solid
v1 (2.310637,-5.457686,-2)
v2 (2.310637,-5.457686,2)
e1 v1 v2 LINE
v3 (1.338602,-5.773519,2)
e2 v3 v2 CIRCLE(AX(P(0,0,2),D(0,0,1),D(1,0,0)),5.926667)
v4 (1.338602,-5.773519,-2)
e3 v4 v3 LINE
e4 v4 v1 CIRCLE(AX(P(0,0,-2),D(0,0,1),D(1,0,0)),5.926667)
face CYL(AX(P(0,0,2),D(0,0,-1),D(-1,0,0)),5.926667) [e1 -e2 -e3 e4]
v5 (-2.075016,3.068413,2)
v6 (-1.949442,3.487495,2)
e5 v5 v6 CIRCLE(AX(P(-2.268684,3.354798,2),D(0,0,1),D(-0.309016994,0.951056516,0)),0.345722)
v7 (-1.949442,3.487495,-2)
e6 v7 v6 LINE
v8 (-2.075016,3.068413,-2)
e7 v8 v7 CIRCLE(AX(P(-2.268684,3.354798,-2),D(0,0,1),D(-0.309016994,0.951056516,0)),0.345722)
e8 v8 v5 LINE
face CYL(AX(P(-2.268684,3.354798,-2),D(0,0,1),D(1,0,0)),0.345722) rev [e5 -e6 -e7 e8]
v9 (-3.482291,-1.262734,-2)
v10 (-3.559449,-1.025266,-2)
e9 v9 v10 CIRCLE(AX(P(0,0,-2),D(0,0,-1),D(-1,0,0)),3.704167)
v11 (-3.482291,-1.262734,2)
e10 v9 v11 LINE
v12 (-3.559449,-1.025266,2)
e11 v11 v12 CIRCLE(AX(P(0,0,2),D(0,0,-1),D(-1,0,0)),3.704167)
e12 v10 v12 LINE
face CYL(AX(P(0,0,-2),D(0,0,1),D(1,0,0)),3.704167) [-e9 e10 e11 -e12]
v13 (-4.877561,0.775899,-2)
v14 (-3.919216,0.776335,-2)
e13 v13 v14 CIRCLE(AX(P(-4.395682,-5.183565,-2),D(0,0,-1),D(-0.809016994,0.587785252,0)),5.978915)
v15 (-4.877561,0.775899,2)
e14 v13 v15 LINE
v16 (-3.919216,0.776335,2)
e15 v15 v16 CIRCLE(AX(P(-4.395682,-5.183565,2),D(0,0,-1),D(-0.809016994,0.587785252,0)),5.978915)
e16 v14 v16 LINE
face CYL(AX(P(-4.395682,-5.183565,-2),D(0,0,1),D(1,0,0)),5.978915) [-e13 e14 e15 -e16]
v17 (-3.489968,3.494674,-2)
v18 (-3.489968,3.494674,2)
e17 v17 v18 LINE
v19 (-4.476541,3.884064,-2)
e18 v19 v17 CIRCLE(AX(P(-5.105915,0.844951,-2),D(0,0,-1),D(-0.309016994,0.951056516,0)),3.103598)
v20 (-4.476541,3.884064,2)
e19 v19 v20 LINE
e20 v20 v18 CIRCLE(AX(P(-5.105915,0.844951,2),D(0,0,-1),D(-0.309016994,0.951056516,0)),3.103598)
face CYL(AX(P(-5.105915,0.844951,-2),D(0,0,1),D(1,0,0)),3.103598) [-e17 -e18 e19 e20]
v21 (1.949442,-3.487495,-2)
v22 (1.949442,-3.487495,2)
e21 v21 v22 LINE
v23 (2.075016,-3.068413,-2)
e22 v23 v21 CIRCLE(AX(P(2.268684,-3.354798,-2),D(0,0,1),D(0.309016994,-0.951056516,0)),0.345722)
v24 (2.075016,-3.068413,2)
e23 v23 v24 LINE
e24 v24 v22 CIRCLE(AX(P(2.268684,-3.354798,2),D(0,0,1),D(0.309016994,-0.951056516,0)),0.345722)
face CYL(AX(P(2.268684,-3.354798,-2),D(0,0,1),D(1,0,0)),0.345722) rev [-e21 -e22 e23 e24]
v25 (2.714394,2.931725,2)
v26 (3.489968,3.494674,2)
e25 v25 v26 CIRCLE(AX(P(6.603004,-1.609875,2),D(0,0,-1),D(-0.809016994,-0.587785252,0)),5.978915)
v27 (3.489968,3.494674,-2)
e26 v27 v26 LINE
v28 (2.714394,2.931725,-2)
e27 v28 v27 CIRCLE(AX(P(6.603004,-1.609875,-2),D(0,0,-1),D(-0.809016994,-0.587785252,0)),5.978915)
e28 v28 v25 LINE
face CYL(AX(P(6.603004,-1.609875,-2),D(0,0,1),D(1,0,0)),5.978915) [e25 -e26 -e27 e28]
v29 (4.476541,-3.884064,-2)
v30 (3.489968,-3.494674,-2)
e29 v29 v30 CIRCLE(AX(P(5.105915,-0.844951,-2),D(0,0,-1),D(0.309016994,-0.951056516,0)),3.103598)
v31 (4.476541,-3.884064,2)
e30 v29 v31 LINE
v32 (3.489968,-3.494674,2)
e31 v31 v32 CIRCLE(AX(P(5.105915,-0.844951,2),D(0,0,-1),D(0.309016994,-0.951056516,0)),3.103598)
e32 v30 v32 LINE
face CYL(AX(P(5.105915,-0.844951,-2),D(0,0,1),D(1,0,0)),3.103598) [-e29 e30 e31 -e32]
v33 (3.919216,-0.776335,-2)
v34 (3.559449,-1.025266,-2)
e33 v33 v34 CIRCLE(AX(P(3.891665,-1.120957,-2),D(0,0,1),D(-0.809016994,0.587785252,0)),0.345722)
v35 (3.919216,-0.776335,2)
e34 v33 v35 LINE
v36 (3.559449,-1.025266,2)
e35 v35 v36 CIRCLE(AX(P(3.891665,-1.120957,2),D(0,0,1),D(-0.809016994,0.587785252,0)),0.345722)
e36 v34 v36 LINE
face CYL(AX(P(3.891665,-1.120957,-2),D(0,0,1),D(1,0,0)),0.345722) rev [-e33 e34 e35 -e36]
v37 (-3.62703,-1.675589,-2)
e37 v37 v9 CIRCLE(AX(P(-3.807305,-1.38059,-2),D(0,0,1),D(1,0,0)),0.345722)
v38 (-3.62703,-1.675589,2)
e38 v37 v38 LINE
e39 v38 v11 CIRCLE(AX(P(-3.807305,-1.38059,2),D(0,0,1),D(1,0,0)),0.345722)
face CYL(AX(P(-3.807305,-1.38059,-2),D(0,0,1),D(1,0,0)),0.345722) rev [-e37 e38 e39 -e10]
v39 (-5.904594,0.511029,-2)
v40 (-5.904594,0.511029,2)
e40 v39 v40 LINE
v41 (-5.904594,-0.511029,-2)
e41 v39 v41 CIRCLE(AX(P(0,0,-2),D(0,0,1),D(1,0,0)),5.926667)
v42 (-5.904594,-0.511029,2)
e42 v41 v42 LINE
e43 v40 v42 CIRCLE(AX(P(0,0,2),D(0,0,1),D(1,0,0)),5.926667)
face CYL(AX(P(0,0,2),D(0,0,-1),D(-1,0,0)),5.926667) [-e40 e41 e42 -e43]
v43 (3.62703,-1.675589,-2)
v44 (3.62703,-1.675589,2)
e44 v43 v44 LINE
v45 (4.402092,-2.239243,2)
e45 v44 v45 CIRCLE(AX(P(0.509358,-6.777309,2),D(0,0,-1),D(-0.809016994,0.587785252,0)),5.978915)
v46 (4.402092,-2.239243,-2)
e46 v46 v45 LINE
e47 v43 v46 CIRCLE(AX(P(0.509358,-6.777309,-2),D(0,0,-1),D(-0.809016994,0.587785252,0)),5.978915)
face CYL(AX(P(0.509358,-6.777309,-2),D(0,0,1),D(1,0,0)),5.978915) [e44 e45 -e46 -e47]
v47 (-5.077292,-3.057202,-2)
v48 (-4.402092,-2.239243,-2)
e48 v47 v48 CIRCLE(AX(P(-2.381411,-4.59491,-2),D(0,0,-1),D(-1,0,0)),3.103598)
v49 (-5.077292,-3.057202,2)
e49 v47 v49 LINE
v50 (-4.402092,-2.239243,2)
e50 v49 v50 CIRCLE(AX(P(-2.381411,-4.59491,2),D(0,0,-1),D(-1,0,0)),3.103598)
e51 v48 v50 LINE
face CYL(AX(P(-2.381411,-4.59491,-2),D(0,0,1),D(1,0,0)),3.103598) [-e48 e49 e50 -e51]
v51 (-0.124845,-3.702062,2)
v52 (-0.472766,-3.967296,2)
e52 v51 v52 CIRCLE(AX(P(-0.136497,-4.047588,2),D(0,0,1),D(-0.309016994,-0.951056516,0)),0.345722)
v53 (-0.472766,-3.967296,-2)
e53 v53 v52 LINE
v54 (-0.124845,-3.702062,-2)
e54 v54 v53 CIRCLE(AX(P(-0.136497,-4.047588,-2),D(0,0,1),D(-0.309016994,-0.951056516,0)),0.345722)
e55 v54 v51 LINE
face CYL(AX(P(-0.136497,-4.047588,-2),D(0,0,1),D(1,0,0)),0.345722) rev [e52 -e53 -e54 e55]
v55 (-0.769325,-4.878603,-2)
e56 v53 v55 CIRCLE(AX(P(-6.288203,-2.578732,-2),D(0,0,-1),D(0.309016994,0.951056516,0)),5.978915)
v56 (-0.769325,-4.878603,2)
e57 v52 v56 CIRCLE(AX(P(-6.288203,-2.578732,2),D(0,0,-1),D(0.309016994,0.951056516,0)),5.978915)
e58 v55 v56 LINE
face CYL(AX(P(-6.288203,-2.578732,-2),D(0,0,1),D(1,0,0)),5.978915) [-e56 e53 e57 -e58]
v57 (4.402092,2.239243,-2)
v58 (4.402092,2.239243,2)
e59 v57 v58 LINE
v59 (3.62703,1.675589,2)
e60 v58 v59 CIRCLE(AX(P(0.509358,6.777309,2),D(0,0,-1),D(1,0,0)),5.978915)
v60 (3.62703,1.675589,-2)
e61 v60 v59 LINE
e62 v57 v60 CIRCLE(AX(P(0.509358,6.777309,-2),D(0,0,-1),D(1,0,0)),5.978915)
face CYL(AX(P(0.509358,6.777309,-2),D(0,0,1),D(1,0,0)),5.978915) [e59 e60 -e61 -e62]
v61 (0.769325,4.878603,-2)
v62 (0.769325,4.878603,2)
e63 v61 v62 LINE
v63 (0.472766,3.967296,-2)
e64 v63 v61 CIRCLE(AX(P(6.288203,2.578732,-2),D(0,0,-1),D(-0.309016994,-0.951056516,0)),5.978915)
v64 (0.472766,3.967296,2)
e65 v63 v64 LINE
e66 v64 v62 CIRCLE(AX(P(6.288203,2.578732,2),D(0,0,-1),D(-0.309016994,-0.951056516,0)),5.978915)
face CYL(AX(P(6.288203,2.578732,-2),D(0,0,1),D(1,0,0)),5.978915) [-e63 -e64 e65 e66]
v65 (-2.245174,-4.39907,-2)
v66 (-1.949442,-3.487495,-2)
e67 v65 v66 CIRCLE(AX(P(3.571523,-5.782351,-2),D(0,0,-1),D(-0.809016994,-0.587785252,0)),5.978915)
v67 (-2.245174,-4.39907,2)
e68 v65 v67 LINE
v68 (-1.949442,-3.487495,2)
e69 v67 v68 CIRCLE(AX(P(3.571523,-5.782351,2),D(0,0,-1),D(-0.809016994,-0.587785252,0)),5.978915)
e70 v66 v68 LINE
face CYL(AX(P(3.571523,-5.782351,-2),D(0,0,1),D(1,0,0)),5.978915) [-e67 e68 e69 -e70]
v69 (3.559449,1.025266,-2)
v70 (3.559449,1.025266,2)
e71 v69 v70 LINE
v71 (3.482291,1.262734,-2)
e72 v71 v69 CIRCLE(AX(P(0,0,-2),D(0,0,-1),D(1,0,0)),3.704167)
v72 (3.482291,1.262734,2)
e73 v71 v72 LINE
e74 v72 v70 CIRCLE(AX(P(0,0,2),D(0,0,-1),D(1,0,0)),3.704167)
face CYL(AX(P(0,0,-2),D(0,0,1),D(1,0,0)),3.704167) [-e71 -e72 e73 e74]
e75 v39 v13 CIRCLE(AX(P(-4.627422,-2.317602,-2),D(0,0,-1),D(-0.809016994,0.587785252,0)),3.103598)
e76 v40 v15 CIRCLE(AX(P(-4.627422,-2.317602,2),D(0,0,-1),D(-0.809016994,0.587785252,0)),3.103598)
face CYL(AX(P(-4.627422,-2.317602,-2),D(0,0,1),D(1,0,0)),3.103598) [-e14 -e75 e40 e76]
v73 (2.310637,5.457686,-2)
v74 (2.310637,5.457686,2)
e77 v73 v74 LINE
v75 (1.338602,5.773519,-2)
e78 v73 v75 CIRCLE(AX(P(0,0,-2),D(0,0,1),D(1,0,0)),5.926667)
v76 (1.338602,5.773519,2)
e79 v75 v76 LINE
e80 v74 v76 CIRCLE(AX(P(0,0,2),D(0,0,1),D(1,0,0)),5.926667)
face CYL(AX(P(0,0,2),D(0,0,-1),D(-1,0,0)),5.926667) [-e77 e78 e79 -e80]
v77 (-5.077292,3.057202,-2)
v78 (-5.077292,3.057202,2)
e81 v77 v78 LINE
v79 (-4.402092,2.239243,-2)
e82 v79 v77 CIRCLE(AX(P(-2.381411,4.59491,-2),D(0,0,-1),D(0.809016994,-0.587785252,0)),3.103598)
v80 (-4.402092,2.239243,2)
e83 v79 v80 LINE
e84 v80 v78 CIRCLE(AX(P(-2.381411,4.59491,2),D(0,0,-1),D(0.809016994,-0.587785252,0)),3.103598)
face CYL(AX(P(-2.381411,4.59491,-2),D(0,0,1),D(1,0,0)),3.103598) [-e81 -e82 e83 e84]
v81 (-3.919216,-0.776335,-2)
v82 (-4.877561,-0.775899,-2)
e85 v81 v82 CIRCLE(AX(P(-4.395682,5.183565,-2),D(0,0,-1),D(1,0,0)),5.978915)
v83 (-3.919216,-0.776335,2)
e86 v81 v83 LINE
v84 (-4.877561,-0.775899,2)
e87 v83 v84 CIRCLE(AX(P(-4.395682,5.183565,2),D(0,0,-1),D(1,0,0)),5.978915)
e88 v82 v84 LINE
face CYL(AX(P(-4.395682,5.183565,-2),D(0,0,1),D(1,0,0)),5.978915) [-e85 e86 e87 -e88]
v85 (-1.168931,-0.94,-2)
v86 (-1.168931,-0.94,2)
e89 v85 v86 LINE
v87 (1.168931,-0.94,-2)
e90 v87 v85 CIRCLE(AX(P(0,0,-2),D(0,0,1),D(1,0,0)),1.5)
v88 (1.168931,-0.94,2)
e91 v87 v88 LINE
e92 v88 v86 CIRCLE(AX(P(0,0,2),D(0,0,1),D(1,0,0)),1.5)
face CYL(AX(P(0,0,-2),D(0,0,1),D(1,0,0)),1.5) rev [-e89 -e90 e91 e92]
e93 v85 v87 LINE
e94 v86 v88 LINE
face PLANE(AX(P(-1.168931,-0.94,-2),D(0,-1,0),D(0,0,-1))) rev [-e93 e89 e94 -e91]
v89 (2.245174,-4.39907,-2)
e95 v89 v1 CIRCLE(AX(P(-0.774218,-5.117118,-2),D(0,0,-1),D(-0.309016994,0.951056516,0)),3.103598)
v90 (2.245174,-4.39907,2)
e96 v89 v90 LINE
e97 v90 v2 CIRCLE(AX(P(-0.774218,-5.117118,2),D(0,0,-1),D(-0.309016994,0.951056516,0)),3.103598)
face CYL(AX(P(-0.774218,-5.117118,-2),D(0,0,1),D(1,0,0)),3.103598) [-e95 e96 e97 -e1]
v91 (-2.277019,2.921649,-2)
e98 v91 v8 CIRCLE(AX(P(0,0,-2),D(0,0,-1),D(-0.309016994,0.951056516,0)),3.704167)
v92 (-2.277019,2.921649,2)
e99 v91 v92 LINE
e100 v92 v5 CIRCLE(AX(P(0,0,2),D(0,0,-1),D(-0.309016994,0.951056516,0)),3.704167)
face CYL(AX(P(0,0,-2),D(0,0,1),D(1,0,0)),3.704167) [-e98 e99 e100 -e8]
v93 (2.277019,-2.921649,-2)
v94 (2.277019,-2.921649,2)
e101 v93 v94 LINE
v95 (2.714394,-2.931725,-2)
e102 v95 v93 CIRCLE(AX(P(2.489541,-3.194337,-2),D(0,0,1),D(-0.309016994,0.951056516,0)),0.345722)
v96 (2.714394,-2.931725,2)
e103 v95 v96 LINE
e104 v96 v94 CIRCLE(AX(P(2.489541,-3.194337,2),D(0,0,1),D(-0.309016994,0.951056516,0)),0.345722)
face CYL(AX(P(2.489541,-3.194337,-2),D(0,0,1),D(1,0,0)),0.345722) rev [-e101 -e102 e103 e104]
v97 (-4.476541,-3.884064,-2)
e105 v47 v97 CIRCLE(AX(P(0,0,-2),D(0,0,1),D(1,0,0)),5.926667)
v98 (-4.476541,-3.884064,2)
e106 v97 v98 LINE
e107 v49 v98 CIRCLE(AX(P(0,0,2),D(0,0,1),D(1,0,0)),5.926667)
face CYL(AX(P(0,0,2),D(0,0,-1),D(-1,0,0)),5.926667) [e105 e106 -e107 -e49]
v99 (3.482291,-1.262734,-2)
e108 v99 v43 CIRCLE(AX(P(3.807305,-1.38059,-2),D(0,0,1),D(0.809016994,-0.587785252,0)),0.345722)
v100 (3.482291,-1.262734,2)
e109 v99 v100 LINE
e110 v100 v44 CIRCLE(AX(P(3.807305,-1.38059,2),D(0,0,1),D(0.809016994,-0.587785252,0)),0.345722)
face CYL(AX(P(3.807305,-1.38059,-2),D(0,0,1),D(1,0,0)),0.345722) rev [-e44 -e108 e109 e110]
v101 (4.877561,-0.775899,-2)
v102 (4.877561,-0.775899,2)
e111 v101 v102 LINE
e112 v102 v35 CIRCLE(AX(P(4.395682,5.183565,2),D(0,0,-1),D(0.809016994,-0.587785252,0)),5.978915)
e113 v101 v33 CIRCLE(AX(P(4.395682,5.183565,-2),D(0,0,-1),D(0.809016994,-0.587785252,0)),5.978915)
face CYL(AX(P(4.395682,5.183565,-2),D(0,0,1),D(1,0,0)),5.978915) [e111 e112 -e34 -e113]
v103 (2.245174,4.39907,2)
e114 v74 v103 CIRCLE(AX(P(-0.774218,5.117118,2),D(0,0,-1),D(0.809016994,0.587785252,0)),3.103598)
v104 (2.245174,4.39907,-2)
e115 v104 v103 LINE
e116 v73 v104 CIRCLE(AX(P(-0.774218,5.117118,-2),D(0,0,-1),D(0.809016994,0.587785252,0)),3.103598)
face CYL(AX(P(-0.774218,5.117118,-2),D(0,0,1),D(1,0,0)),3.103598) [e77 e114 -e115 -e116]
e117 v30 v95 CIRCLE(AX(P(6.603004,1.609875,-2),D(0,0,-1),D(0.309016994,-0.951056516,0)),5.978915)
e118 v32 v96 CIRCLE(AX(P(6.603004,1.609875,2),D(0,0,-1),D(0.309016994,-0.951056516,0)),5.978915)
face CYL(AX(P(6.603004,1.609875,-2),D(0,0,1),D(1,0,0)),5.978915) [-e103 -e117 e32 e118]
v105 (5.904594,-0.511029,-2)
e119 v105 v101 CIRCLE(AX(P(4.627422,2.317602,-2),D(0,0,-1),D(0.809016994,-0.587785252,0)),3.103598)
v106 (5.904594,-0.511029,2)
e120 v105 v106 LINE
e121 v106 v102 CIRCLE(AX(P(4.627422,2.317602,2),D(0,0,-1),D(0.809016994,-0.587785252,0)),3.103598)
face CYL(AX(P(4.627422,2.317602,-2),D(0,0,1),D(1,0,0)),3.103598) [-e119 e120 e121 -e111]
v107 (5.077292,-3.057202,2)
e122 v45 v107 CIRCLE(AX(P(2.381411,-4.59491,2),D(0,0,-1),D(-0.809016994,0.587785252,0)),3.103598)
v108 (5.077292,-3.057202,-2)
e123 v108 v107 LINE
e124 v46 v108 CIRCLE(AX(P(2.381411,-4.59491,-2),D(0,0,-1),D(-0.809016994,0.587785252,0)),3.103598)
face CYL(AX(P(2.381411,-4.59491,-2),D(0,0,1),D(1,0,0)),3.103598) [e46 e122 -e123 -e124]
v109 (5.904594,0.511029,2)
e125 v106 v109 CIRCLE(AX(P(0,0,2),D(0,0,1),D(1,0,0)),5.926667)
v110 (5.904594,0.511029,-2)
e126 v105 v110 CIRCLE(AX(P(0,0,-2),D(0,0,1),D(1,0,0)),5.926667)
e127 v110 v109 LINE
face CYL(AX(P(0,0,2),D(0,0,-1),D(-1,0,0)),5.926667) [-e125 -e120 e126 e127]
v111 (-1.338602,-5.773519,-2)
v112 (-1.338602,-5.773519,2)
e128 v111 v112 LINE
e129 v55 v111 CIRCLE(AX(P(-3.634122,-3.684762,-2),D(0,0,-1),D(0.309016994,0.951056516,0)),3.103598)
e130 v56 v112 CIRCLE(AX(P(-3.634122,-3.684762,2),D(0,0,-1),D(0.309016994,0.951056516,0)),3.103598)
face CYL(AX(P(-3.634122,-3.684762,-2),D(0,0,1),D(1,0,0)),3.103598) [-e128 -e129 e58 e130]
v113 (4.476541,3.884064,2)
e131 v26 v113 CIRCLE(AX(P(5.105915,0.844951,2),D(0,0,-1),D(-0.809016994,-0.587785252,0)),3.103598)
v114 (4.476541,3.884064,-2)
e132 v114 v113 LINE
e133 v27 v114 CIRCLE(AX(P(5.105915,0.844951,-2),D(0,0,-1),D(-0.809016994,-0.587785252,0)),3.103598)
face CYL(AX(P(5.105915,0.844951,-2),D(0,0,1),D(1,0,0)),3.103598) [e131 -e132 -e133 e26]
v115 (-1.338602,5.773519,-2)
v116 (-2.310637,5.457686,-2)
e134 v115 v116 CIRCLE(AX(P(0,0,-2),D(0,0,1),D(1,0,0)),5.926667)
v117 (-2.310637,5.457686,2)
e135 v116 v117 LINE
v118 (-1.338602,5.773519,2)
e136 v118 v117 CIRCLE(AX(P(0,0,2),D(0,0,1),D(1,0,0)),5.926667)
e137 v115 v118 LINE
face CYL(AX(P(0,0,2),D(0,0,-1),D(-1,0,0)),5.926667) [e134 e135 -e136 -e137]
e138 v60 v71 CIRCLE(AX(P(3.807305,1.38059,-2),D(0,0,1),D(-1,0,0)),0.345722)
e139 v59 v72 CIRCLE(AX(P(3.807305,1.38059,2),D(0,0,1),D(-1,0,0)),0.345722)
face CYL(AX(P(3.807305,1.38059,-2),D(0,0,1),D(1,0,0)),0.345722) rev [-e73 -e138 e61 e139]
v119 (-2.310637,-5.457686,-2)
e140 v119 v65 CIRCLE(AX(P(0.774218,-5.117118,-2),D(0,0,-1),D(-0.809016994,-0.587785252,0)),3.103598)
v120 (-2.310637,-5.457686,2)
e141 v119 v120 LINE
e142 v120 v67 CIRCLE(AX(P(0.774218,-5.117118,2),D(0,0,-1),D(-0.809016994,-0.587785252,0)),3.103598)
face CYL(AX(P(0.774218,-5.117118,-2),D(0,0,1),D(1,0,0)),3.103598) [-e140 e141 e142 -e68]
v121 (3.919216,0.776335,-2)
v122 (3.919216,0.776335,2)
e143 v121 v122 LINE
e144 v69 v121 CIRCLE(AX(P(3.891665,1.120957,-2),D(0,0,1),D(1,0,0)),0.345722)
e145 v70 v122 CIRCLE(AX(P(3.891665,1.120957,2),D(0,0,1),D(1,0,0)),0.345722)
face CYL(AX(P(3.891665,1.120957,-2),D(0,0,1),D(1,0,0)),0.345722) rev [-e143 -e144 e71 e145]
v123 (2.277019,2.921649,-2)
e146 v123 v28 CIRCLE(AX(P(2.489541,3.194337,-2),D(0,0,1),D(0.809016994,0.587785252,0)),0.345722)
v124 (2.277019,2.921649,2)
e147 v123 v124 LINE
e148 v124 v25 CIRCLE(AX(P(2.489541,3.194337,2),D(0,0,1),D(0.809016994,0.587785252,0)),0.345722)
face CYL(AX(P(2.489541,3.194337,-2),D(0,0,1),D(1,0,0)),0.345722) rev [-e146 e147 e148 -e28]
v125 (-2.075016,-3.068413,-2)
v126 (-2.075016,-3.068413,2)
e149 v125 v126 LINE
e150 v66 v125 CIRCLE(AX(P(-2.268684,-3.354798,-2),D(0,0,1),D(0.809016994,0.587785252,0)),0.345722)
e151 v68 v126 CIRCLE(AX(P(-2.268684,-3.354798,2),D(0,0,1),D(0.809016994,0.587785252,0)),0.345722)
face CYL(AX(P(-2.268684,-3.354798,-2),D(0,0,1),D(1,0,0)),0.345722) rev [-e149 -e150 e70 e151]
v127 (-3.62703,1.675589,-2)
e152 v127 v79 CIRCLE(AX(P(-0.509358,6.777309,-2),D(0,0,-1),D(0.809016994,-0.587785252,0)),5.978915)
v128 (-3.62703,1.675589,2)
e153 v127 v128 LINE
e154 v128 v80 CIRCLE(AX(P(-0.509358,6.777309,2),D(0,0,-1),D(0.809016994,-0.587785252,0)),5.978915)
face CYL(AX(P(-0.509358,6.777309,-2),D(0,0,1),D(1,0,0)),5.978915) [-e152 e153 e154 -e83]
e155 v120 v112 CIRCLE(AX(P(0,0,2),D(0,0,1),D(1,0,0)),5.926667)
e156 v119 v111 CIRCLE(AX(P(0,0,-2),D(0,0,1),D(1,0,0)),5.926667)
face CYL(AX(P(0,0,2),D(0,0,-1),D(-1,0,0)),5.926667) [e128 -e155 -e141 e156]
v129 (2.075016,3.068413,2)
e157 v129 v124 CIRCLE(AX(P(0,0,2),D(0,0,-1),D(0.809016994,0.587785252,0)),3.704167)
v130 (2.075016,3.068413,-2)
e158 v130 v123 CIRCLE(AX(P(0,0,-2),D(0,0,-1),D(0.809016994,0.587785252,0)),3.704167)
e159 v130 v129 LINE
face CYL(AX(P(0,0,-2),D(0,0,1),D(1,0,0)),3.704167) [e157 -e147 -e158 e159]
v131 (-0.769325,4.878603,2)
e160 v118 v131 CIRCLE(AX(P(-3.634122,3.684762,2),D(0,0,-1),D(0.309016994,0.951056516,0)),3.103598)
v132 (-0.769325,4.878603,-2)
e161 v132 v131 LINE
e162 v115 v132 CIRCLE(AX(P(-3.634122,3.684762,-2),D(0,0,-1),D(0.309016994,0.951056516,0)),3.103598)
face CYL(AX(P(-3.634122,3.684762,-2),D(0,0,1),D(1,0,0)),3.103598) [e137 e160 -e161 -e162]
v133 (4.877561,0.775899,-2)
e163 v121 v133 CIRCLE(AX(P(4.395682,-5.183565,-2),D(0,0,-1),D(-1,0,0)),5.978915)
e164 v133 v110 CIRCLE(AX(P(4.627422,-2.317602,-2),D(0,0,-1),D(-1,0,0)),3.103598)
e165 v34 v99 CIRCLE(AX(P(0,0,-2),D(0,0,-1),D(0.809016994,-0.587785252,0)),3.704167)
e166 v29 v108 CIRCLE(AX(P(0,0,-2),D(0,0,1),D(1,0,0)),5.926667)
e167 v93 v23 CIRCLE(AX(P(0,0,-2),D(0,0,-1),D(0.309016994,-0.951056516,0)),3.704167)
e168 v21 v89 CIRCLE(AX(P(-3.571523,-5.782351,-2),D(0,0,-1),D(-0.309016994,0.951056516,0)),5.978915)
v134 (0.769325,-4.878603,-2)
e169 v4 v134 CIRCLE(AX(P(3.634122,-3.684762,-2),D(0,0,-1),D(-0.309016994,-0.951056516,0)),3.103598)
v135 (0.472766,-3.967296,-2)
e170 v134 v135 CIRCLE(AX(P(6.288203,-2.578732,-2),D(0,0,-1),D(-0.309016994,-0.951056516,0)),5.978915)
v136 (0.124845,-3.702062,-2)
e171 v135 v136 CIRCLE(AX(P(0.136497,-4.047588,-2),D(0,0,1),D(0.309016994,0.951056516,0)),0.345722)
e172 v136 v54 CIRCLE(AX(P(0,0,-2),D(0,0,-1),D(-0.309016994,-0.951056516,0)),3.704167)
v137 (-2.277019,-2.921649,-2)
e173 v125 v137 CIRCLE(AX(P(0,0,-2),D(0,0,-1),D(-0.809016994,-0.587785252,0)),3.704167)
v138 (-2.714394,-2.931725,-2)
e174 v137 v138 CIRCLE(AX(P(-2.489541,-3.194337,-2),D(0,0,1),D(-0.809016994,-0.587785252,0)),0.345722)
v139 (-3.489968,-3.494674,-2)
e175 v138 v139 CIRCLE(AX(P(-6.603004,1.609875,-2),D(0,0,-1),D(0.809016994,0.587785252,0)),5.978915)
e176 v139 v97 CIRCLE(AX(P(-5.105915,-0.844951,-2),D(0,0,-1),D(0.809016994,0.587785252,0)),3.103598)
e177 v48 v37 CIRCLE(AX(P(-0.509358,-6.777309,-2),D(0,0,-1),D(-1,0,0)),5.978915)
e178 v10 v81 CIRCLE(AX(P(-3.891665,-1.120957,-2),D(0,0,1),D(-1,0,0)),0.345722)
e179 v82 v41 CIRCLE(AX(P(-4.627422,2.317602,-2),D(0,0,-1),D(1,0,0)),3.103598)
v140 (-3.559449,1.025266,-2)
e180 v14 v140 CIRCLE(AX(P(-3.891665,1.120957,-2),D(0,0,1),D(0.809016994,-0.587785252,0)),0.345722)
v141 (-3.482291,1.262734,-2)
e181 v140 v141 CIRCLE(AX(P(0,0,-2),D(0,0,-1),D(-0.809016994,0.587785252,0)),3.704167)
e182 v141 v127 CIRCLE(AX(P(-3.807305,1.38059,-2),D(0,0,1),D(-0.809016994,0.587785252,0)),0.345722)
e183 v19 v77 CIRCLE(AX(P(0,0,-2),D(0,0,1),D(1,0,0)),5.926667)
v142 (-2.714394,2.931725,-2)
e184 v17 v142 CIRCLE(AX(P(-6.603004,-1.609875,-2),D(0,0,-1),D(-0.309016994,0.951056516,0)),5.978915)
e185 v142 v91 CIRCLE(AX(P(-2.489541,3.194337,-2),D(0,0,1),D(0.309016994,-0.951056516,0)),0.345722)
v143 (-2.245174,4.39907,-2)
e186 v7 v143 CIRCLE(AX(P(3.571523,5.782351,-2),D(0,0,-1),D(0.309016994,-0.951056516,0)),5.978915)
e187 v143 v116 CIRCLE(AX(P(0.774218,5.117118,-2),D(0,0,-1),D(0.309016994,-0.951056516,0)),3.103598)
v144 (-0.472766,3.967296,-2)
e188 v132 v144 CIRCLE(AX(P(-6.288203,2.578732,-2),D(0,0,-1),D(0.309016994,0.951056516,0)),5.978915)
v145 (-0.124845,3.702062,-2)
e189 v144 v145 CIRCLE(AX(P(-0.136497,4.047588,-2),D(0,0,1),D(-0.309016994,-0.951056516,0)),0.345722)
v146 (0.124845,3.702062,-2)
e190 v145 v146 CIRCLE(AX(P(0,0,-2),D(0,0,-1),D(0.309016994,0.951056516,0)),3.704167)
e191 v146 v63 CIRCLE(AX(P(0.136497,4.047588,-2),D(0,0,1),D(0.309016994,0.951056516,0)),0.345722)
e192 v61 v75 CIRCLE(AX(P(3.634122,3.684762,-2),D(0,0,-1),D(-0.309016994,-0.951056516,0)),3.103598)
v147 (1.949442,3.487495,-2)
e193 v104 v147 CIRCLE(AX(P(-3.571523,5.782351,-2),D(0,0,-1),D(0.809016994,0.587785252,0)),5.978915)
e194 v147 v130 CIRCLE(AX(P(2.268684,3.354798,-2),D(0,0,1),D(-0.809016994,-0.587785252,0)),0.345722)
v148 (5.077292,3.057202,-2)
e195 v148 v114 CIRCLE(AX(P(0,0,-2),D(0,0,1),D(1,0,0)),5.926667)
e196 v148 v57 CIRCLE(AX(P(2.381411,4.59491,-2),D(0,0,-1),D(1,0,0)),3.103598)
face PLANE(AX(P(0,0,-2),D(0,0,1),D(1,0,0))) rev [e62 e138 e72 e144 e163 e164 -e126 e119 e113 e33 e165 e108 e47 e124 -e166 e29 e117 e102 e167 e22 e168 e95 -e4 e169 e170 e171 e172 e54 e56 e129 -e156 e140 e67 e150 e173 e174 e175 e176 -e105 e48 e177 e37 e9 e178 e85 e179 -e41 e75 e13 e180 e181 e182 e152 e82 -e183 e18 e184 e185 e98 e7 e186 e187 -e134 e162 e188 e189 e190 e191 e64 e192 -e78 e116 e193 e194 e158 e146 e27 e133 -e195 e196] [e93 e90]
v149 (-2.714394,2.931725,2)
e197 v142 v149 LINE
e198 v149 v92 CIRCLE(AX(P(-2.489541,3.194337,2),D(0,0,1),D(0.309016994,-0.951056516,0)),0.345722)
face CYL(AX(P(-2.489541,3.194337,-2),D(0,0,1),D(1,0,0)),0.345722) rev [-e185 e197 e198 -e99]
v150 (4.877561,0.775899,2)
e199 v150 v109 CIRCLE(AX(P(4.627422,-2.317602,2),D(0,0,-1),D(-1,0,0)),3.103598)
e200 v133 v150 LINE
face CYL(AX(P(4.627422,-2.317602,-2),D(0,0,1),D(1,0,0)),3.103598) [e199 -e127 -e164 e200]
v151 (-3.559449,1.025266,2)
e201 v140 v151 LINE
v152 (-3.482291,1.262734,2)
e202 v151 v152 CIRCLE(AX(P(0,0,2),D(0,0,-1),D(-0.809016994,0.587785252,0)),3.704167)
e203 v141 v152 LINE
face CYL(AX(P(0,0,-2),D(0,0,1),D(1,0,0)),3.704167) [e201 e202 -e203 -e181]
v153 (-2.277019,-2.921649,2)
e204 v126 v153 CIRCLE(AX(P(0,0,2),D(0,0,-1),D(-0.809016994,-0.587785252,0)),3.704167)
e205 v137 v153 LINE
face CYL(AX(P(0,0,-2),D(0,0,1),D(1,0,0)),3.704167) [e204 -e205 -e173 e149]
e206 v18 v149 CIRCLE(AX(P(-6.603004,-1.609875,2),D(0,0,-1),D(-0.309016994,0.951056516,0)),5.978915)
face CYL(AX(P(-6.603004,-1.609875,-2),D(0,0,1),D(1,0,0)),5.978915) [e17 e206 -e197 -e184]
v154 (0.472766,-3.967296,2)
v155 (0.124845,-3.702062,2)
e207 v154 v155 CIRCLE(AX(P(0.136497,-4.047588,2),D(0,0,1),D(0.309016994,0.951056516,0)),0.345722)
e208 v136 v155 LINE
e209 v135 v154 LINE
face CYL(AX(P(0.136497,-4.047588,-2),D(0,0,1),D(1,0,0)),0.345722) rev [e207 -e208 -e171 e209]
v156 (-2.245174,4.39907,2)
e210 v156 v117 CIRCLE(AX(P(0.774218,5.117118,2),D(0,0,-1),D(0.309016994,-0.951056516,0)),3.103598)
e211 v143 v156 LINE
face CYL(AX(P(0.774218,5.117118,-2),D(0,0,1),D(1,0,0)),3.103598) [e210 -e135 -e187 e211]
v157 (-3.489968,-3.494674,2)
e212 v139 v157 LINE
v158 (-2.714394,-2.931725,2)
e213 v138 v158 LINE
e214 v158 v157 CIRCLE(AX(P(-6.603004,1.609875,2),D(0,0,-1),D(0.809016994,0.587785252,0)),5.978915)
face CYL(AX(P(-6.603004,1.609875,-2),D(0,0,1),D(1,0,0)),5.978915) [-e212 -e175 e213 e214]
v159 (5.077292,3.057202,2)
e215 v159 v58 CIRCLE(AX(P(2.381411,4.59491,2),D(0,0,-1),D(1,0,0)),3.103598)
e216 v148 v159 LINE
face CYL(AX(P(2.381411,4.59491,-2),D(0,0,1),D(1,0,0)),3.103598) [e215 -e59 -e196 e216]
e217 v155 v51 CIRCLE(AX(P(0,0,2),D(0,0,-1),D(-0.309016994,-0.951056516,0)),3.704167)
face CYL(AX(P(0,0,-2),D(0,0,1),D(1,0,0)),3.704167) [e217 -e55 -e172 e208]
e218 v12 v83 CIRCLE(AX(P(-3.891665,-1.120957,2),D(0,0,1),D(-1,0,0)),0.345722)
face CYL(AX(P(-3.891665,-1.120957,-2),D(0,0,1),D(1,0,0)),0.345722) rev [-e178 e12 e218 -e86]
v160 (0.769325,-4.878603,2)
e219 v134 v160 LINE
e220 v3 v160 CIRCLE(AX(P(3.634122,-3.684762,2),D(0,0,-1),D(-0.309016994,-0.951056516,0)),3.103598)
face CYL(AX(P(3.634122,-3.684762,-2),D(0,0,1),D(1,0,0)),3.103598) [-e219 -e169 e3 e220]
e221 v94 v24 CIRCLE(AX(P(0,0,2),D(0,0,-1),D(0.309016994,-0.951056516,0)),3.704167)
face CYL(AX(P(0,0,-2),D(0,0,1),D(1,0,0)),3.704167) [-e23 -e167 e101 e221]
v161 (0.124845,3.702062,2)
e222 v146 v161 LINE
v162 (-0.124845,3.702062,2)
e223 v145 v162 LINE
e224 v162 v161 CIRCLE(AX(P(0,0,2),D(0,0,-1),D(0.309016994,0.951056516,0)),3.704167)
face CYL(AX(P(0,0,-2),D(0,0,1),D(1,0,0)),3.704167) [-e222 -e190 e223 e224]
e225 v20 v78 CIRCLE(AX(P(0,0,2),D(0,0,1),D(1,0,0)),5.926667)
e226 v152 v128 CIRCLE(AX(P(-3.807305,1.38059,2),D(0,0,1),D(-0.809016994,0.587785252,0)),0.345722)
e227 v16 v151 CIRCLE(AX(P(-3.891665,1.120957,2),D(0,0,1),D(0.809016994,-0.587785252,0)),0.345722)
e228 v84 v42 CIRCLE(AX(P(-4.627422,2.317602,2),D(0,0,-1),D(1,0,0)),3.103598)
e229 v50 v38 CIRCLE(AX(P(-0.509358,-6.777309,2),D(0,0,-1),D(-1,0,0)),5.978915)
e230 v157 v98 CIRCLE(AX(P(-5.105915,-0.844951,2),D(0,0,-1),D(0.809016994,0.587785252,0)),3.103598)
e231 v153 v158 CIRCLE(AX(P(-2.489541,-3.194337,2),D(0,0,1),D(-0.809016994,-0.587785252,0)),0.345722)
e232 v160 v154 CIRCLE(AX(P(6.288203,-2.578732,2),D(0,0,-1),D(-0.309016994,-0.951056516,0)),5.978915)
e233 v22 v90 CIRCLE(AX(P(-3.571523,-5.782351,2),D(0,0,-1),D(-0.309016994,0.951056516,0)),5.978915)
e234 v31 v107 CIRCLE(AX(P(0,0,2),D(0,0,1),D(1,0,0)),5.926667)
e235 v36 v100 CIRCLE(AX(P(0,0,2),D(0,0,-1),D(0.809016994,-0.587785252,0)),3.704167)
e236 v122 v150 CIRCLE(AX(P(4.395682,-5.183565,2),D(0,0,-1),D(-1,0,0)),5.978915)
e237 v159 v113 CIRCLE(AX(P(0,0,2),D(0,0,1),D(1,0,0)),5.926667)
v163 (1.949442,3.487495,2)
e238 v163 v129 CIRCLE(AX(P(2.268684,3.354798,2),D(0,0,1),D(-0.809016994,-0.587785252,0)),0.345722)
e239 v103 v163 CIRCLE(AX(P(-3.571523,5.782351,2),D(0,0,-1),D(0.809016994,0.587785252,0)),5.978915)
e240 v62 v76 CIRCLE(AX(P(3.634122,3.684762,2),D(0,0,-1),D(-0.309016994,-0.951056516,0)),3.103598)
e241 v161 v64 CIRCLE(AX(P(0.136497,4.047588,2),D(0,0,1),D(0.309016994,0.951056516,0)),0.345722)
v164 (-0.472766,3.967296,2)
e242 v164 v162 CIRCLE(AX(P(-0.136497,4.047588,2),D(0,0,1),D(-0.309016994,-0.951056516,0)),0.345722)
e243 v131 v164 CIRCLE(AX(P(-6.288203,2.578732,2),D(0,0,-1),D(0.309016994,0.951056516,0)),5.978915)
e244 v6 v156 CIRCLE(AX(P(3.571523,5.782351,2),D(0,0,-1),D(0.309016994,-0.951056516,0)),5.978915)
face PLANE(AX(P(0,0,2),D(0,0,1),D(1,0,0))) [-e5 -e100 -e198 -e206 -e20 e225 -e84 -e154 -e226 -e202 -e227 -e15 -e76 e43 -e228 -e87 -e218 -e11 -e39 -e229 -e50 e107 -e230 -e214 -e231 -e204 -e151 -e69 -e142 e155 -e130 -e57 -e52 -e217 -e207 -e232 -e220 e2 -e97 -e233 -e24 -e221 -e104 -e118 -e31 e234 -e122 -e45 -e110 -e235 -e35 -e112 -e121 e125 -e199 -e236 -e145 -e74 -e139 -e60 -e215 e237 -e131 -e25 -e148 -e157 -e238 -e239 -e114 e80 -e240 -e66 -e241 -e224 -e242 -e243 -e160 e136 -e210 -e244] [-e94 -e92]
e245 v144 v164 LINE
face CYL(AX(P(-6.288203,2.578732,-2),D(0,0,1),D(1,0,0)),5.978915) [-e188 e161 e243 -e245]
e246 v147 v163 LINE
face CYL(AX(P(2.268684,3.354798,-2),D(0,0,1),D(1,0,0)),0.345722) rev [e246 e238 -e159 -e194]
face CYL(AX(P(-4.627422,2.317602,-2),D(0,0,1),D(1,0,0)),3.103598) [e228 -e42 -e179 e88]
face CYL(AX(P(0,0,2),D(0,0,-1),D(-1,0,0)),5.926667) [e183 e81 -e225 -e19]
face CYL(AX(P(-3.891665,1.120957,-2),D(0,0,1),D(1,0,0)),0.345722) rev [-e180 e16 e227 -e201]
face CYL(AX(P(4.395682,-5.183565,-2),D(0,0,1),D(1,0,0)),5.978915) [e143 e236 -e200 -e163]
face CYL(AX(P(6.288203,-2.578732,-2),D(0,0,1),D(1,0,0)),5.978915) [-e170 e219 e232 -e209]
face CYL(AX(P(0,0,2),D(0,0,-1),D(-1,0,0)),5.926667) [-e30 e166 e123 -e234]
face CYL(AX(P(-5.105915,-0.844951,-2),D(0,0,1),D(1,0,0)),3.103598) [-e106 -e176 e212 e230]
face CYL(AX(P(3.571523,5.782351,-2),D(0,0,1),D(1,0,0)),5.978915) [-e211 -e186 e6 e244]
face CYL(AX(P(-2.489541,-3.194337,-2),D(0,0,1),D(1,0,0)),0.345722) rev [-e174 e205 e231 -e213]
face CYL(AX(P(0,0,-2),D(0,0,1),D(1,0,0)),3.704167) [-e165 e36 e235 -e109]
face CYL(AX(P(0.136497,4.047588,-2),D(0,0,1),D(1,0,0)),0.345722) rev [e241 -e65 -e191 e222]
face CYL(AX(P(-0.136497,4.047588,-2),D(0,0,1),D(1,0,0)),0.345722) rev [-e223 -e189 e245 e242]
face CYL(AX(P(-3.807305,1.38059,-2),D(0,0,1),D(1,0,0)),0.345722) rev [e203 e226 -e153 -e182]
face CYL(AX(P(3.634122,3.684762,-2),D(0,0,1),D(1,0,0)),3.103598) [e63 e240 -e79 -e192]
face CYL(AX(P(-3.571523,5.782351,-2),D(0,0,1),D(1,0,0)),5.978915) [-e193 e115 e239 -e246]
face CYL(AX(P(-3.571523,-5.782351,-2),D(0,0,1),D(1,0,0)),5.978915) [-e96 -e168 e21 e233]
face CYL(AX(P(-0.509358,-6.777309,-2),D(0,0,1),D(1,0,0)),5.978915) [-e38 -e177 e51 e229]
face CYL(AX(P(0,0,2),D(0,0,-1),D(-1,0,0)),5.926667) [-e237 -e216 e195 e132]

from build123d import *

# Parameters (mm, degrees)
SKETCH1_R                = 5.926666667
BLANK_DISK_DEPTH         = 2.000000064
GEAR_TOOTH_CUT_DEPTH     = 10.287128543
GEAR_TEETH_REVOLVE_COUNT = 10
SKETCH4_R                = 0.75
HUB_EXTRUDE_DEPTH        = 0.635
HEX_BORE_CUT_DEPTH       = 10.19015236
HEX_BORE_CUT_DEPTH_BACK  = 10.19015236


with BuildPart() as part:
    # Sketch1 → BLANK DISK (new, symmetric)
    with BuildSketch(Plane.XY):
        Circle(SKETCH1_R)
    extrude(amount=BLANK_DISK_DEPTH, both=True)

    # Sketch2 → GEAR TOOTH CUT (cut, through all)
    with BuildSketch(Plane.XY.offset(2.000000064)):
        with BuildLine():
            ThreePointArc((-5.077291995, -3.057201951), (-5.636594953, -1.83144072), (-5.90459373, -0.511029022))
            ThreePointArc((-5.90459373, -0.511029022), (-5.402476049, -0.687662082), (-4.877561226, -0.775899444))
            ThreePointArc((-4.877561226, -0.775899444), (-4.39839721, -0.795349357), (-3.919215726, -0.776334691))
            ThreePointArc((-3.919215726, -0.776334691), (-3.694949803, -0.83665634), (-3.55944947, -1.025265898))
            ThreePointArc((-3.55944947, -1.025265898), (-3.522871846, -1.14465045), (-3.482291287, -1.26273437))
            ThreePointArc((-3.482291287, -1.26273437), (-3.481051441, -1.494967805), (-3.627030209, -1.675589246))
            ThreePointArc((-3.627030209, -1.675589246), (-4.025872713, -1.941861868), (-4.402092173, -2.239242719))
            ThreePointArc((-4.402092173, -2.239242719), (-4.774892565, -2.619165437), (-5.077291995, -3.057201951))
        make_face()
    gear_tooth_cut = extrude(amount=-GEAR_TOOTH_CUT_DEPTH, mode=Mode.SUBTRACT)

    # GEAR TEETH REVOLVE: GEAR TOOTH CUT ×10 about axis
    gear_teeth_revolve_axis = Axis((0, 0, 50), (0, 0, -1))
    for i in range(1, GEAR_TEETH_REVOLVE_COUNT):
        add(gear_tooth_cut.rotate(gear_teeth_revolve_axis, i * 360 / GEAR_TEETH_REVOLVE_COUNT), mode=Mode.SUBTRACT)

    # Sketch4 → Hub Extrude (add)
    with BuildSketch(Plane.XY.offset(2.000000064)):
        Circle(SKETCH4_R)
    extrude(amount=HUB_EXTRUDE_DEPTH)

    # Sketch3 → HEX BORE CUT (cut, two sides: drawn at the far end of the back side and taken through both)
    with BuildSketch(Plane.XY.offset(2.000000064).offset(-HEX_BORE_CUT_DEPTH_BACK)):
        with BuildLine():
            Line((-1.168931136, -0.94), (1.168931136, -0.94))
            ThreePointArc((1.168931136, -0.94), (0, 1.5), (-1.168931136, -0.94))
        make_face()
    extrude(amount=HEX_BORE_CUT_DEPTH + HEX_BORE_CUT_DEPTH_BACK, mode=Mode.SUBTRACT)


solid = part.part
